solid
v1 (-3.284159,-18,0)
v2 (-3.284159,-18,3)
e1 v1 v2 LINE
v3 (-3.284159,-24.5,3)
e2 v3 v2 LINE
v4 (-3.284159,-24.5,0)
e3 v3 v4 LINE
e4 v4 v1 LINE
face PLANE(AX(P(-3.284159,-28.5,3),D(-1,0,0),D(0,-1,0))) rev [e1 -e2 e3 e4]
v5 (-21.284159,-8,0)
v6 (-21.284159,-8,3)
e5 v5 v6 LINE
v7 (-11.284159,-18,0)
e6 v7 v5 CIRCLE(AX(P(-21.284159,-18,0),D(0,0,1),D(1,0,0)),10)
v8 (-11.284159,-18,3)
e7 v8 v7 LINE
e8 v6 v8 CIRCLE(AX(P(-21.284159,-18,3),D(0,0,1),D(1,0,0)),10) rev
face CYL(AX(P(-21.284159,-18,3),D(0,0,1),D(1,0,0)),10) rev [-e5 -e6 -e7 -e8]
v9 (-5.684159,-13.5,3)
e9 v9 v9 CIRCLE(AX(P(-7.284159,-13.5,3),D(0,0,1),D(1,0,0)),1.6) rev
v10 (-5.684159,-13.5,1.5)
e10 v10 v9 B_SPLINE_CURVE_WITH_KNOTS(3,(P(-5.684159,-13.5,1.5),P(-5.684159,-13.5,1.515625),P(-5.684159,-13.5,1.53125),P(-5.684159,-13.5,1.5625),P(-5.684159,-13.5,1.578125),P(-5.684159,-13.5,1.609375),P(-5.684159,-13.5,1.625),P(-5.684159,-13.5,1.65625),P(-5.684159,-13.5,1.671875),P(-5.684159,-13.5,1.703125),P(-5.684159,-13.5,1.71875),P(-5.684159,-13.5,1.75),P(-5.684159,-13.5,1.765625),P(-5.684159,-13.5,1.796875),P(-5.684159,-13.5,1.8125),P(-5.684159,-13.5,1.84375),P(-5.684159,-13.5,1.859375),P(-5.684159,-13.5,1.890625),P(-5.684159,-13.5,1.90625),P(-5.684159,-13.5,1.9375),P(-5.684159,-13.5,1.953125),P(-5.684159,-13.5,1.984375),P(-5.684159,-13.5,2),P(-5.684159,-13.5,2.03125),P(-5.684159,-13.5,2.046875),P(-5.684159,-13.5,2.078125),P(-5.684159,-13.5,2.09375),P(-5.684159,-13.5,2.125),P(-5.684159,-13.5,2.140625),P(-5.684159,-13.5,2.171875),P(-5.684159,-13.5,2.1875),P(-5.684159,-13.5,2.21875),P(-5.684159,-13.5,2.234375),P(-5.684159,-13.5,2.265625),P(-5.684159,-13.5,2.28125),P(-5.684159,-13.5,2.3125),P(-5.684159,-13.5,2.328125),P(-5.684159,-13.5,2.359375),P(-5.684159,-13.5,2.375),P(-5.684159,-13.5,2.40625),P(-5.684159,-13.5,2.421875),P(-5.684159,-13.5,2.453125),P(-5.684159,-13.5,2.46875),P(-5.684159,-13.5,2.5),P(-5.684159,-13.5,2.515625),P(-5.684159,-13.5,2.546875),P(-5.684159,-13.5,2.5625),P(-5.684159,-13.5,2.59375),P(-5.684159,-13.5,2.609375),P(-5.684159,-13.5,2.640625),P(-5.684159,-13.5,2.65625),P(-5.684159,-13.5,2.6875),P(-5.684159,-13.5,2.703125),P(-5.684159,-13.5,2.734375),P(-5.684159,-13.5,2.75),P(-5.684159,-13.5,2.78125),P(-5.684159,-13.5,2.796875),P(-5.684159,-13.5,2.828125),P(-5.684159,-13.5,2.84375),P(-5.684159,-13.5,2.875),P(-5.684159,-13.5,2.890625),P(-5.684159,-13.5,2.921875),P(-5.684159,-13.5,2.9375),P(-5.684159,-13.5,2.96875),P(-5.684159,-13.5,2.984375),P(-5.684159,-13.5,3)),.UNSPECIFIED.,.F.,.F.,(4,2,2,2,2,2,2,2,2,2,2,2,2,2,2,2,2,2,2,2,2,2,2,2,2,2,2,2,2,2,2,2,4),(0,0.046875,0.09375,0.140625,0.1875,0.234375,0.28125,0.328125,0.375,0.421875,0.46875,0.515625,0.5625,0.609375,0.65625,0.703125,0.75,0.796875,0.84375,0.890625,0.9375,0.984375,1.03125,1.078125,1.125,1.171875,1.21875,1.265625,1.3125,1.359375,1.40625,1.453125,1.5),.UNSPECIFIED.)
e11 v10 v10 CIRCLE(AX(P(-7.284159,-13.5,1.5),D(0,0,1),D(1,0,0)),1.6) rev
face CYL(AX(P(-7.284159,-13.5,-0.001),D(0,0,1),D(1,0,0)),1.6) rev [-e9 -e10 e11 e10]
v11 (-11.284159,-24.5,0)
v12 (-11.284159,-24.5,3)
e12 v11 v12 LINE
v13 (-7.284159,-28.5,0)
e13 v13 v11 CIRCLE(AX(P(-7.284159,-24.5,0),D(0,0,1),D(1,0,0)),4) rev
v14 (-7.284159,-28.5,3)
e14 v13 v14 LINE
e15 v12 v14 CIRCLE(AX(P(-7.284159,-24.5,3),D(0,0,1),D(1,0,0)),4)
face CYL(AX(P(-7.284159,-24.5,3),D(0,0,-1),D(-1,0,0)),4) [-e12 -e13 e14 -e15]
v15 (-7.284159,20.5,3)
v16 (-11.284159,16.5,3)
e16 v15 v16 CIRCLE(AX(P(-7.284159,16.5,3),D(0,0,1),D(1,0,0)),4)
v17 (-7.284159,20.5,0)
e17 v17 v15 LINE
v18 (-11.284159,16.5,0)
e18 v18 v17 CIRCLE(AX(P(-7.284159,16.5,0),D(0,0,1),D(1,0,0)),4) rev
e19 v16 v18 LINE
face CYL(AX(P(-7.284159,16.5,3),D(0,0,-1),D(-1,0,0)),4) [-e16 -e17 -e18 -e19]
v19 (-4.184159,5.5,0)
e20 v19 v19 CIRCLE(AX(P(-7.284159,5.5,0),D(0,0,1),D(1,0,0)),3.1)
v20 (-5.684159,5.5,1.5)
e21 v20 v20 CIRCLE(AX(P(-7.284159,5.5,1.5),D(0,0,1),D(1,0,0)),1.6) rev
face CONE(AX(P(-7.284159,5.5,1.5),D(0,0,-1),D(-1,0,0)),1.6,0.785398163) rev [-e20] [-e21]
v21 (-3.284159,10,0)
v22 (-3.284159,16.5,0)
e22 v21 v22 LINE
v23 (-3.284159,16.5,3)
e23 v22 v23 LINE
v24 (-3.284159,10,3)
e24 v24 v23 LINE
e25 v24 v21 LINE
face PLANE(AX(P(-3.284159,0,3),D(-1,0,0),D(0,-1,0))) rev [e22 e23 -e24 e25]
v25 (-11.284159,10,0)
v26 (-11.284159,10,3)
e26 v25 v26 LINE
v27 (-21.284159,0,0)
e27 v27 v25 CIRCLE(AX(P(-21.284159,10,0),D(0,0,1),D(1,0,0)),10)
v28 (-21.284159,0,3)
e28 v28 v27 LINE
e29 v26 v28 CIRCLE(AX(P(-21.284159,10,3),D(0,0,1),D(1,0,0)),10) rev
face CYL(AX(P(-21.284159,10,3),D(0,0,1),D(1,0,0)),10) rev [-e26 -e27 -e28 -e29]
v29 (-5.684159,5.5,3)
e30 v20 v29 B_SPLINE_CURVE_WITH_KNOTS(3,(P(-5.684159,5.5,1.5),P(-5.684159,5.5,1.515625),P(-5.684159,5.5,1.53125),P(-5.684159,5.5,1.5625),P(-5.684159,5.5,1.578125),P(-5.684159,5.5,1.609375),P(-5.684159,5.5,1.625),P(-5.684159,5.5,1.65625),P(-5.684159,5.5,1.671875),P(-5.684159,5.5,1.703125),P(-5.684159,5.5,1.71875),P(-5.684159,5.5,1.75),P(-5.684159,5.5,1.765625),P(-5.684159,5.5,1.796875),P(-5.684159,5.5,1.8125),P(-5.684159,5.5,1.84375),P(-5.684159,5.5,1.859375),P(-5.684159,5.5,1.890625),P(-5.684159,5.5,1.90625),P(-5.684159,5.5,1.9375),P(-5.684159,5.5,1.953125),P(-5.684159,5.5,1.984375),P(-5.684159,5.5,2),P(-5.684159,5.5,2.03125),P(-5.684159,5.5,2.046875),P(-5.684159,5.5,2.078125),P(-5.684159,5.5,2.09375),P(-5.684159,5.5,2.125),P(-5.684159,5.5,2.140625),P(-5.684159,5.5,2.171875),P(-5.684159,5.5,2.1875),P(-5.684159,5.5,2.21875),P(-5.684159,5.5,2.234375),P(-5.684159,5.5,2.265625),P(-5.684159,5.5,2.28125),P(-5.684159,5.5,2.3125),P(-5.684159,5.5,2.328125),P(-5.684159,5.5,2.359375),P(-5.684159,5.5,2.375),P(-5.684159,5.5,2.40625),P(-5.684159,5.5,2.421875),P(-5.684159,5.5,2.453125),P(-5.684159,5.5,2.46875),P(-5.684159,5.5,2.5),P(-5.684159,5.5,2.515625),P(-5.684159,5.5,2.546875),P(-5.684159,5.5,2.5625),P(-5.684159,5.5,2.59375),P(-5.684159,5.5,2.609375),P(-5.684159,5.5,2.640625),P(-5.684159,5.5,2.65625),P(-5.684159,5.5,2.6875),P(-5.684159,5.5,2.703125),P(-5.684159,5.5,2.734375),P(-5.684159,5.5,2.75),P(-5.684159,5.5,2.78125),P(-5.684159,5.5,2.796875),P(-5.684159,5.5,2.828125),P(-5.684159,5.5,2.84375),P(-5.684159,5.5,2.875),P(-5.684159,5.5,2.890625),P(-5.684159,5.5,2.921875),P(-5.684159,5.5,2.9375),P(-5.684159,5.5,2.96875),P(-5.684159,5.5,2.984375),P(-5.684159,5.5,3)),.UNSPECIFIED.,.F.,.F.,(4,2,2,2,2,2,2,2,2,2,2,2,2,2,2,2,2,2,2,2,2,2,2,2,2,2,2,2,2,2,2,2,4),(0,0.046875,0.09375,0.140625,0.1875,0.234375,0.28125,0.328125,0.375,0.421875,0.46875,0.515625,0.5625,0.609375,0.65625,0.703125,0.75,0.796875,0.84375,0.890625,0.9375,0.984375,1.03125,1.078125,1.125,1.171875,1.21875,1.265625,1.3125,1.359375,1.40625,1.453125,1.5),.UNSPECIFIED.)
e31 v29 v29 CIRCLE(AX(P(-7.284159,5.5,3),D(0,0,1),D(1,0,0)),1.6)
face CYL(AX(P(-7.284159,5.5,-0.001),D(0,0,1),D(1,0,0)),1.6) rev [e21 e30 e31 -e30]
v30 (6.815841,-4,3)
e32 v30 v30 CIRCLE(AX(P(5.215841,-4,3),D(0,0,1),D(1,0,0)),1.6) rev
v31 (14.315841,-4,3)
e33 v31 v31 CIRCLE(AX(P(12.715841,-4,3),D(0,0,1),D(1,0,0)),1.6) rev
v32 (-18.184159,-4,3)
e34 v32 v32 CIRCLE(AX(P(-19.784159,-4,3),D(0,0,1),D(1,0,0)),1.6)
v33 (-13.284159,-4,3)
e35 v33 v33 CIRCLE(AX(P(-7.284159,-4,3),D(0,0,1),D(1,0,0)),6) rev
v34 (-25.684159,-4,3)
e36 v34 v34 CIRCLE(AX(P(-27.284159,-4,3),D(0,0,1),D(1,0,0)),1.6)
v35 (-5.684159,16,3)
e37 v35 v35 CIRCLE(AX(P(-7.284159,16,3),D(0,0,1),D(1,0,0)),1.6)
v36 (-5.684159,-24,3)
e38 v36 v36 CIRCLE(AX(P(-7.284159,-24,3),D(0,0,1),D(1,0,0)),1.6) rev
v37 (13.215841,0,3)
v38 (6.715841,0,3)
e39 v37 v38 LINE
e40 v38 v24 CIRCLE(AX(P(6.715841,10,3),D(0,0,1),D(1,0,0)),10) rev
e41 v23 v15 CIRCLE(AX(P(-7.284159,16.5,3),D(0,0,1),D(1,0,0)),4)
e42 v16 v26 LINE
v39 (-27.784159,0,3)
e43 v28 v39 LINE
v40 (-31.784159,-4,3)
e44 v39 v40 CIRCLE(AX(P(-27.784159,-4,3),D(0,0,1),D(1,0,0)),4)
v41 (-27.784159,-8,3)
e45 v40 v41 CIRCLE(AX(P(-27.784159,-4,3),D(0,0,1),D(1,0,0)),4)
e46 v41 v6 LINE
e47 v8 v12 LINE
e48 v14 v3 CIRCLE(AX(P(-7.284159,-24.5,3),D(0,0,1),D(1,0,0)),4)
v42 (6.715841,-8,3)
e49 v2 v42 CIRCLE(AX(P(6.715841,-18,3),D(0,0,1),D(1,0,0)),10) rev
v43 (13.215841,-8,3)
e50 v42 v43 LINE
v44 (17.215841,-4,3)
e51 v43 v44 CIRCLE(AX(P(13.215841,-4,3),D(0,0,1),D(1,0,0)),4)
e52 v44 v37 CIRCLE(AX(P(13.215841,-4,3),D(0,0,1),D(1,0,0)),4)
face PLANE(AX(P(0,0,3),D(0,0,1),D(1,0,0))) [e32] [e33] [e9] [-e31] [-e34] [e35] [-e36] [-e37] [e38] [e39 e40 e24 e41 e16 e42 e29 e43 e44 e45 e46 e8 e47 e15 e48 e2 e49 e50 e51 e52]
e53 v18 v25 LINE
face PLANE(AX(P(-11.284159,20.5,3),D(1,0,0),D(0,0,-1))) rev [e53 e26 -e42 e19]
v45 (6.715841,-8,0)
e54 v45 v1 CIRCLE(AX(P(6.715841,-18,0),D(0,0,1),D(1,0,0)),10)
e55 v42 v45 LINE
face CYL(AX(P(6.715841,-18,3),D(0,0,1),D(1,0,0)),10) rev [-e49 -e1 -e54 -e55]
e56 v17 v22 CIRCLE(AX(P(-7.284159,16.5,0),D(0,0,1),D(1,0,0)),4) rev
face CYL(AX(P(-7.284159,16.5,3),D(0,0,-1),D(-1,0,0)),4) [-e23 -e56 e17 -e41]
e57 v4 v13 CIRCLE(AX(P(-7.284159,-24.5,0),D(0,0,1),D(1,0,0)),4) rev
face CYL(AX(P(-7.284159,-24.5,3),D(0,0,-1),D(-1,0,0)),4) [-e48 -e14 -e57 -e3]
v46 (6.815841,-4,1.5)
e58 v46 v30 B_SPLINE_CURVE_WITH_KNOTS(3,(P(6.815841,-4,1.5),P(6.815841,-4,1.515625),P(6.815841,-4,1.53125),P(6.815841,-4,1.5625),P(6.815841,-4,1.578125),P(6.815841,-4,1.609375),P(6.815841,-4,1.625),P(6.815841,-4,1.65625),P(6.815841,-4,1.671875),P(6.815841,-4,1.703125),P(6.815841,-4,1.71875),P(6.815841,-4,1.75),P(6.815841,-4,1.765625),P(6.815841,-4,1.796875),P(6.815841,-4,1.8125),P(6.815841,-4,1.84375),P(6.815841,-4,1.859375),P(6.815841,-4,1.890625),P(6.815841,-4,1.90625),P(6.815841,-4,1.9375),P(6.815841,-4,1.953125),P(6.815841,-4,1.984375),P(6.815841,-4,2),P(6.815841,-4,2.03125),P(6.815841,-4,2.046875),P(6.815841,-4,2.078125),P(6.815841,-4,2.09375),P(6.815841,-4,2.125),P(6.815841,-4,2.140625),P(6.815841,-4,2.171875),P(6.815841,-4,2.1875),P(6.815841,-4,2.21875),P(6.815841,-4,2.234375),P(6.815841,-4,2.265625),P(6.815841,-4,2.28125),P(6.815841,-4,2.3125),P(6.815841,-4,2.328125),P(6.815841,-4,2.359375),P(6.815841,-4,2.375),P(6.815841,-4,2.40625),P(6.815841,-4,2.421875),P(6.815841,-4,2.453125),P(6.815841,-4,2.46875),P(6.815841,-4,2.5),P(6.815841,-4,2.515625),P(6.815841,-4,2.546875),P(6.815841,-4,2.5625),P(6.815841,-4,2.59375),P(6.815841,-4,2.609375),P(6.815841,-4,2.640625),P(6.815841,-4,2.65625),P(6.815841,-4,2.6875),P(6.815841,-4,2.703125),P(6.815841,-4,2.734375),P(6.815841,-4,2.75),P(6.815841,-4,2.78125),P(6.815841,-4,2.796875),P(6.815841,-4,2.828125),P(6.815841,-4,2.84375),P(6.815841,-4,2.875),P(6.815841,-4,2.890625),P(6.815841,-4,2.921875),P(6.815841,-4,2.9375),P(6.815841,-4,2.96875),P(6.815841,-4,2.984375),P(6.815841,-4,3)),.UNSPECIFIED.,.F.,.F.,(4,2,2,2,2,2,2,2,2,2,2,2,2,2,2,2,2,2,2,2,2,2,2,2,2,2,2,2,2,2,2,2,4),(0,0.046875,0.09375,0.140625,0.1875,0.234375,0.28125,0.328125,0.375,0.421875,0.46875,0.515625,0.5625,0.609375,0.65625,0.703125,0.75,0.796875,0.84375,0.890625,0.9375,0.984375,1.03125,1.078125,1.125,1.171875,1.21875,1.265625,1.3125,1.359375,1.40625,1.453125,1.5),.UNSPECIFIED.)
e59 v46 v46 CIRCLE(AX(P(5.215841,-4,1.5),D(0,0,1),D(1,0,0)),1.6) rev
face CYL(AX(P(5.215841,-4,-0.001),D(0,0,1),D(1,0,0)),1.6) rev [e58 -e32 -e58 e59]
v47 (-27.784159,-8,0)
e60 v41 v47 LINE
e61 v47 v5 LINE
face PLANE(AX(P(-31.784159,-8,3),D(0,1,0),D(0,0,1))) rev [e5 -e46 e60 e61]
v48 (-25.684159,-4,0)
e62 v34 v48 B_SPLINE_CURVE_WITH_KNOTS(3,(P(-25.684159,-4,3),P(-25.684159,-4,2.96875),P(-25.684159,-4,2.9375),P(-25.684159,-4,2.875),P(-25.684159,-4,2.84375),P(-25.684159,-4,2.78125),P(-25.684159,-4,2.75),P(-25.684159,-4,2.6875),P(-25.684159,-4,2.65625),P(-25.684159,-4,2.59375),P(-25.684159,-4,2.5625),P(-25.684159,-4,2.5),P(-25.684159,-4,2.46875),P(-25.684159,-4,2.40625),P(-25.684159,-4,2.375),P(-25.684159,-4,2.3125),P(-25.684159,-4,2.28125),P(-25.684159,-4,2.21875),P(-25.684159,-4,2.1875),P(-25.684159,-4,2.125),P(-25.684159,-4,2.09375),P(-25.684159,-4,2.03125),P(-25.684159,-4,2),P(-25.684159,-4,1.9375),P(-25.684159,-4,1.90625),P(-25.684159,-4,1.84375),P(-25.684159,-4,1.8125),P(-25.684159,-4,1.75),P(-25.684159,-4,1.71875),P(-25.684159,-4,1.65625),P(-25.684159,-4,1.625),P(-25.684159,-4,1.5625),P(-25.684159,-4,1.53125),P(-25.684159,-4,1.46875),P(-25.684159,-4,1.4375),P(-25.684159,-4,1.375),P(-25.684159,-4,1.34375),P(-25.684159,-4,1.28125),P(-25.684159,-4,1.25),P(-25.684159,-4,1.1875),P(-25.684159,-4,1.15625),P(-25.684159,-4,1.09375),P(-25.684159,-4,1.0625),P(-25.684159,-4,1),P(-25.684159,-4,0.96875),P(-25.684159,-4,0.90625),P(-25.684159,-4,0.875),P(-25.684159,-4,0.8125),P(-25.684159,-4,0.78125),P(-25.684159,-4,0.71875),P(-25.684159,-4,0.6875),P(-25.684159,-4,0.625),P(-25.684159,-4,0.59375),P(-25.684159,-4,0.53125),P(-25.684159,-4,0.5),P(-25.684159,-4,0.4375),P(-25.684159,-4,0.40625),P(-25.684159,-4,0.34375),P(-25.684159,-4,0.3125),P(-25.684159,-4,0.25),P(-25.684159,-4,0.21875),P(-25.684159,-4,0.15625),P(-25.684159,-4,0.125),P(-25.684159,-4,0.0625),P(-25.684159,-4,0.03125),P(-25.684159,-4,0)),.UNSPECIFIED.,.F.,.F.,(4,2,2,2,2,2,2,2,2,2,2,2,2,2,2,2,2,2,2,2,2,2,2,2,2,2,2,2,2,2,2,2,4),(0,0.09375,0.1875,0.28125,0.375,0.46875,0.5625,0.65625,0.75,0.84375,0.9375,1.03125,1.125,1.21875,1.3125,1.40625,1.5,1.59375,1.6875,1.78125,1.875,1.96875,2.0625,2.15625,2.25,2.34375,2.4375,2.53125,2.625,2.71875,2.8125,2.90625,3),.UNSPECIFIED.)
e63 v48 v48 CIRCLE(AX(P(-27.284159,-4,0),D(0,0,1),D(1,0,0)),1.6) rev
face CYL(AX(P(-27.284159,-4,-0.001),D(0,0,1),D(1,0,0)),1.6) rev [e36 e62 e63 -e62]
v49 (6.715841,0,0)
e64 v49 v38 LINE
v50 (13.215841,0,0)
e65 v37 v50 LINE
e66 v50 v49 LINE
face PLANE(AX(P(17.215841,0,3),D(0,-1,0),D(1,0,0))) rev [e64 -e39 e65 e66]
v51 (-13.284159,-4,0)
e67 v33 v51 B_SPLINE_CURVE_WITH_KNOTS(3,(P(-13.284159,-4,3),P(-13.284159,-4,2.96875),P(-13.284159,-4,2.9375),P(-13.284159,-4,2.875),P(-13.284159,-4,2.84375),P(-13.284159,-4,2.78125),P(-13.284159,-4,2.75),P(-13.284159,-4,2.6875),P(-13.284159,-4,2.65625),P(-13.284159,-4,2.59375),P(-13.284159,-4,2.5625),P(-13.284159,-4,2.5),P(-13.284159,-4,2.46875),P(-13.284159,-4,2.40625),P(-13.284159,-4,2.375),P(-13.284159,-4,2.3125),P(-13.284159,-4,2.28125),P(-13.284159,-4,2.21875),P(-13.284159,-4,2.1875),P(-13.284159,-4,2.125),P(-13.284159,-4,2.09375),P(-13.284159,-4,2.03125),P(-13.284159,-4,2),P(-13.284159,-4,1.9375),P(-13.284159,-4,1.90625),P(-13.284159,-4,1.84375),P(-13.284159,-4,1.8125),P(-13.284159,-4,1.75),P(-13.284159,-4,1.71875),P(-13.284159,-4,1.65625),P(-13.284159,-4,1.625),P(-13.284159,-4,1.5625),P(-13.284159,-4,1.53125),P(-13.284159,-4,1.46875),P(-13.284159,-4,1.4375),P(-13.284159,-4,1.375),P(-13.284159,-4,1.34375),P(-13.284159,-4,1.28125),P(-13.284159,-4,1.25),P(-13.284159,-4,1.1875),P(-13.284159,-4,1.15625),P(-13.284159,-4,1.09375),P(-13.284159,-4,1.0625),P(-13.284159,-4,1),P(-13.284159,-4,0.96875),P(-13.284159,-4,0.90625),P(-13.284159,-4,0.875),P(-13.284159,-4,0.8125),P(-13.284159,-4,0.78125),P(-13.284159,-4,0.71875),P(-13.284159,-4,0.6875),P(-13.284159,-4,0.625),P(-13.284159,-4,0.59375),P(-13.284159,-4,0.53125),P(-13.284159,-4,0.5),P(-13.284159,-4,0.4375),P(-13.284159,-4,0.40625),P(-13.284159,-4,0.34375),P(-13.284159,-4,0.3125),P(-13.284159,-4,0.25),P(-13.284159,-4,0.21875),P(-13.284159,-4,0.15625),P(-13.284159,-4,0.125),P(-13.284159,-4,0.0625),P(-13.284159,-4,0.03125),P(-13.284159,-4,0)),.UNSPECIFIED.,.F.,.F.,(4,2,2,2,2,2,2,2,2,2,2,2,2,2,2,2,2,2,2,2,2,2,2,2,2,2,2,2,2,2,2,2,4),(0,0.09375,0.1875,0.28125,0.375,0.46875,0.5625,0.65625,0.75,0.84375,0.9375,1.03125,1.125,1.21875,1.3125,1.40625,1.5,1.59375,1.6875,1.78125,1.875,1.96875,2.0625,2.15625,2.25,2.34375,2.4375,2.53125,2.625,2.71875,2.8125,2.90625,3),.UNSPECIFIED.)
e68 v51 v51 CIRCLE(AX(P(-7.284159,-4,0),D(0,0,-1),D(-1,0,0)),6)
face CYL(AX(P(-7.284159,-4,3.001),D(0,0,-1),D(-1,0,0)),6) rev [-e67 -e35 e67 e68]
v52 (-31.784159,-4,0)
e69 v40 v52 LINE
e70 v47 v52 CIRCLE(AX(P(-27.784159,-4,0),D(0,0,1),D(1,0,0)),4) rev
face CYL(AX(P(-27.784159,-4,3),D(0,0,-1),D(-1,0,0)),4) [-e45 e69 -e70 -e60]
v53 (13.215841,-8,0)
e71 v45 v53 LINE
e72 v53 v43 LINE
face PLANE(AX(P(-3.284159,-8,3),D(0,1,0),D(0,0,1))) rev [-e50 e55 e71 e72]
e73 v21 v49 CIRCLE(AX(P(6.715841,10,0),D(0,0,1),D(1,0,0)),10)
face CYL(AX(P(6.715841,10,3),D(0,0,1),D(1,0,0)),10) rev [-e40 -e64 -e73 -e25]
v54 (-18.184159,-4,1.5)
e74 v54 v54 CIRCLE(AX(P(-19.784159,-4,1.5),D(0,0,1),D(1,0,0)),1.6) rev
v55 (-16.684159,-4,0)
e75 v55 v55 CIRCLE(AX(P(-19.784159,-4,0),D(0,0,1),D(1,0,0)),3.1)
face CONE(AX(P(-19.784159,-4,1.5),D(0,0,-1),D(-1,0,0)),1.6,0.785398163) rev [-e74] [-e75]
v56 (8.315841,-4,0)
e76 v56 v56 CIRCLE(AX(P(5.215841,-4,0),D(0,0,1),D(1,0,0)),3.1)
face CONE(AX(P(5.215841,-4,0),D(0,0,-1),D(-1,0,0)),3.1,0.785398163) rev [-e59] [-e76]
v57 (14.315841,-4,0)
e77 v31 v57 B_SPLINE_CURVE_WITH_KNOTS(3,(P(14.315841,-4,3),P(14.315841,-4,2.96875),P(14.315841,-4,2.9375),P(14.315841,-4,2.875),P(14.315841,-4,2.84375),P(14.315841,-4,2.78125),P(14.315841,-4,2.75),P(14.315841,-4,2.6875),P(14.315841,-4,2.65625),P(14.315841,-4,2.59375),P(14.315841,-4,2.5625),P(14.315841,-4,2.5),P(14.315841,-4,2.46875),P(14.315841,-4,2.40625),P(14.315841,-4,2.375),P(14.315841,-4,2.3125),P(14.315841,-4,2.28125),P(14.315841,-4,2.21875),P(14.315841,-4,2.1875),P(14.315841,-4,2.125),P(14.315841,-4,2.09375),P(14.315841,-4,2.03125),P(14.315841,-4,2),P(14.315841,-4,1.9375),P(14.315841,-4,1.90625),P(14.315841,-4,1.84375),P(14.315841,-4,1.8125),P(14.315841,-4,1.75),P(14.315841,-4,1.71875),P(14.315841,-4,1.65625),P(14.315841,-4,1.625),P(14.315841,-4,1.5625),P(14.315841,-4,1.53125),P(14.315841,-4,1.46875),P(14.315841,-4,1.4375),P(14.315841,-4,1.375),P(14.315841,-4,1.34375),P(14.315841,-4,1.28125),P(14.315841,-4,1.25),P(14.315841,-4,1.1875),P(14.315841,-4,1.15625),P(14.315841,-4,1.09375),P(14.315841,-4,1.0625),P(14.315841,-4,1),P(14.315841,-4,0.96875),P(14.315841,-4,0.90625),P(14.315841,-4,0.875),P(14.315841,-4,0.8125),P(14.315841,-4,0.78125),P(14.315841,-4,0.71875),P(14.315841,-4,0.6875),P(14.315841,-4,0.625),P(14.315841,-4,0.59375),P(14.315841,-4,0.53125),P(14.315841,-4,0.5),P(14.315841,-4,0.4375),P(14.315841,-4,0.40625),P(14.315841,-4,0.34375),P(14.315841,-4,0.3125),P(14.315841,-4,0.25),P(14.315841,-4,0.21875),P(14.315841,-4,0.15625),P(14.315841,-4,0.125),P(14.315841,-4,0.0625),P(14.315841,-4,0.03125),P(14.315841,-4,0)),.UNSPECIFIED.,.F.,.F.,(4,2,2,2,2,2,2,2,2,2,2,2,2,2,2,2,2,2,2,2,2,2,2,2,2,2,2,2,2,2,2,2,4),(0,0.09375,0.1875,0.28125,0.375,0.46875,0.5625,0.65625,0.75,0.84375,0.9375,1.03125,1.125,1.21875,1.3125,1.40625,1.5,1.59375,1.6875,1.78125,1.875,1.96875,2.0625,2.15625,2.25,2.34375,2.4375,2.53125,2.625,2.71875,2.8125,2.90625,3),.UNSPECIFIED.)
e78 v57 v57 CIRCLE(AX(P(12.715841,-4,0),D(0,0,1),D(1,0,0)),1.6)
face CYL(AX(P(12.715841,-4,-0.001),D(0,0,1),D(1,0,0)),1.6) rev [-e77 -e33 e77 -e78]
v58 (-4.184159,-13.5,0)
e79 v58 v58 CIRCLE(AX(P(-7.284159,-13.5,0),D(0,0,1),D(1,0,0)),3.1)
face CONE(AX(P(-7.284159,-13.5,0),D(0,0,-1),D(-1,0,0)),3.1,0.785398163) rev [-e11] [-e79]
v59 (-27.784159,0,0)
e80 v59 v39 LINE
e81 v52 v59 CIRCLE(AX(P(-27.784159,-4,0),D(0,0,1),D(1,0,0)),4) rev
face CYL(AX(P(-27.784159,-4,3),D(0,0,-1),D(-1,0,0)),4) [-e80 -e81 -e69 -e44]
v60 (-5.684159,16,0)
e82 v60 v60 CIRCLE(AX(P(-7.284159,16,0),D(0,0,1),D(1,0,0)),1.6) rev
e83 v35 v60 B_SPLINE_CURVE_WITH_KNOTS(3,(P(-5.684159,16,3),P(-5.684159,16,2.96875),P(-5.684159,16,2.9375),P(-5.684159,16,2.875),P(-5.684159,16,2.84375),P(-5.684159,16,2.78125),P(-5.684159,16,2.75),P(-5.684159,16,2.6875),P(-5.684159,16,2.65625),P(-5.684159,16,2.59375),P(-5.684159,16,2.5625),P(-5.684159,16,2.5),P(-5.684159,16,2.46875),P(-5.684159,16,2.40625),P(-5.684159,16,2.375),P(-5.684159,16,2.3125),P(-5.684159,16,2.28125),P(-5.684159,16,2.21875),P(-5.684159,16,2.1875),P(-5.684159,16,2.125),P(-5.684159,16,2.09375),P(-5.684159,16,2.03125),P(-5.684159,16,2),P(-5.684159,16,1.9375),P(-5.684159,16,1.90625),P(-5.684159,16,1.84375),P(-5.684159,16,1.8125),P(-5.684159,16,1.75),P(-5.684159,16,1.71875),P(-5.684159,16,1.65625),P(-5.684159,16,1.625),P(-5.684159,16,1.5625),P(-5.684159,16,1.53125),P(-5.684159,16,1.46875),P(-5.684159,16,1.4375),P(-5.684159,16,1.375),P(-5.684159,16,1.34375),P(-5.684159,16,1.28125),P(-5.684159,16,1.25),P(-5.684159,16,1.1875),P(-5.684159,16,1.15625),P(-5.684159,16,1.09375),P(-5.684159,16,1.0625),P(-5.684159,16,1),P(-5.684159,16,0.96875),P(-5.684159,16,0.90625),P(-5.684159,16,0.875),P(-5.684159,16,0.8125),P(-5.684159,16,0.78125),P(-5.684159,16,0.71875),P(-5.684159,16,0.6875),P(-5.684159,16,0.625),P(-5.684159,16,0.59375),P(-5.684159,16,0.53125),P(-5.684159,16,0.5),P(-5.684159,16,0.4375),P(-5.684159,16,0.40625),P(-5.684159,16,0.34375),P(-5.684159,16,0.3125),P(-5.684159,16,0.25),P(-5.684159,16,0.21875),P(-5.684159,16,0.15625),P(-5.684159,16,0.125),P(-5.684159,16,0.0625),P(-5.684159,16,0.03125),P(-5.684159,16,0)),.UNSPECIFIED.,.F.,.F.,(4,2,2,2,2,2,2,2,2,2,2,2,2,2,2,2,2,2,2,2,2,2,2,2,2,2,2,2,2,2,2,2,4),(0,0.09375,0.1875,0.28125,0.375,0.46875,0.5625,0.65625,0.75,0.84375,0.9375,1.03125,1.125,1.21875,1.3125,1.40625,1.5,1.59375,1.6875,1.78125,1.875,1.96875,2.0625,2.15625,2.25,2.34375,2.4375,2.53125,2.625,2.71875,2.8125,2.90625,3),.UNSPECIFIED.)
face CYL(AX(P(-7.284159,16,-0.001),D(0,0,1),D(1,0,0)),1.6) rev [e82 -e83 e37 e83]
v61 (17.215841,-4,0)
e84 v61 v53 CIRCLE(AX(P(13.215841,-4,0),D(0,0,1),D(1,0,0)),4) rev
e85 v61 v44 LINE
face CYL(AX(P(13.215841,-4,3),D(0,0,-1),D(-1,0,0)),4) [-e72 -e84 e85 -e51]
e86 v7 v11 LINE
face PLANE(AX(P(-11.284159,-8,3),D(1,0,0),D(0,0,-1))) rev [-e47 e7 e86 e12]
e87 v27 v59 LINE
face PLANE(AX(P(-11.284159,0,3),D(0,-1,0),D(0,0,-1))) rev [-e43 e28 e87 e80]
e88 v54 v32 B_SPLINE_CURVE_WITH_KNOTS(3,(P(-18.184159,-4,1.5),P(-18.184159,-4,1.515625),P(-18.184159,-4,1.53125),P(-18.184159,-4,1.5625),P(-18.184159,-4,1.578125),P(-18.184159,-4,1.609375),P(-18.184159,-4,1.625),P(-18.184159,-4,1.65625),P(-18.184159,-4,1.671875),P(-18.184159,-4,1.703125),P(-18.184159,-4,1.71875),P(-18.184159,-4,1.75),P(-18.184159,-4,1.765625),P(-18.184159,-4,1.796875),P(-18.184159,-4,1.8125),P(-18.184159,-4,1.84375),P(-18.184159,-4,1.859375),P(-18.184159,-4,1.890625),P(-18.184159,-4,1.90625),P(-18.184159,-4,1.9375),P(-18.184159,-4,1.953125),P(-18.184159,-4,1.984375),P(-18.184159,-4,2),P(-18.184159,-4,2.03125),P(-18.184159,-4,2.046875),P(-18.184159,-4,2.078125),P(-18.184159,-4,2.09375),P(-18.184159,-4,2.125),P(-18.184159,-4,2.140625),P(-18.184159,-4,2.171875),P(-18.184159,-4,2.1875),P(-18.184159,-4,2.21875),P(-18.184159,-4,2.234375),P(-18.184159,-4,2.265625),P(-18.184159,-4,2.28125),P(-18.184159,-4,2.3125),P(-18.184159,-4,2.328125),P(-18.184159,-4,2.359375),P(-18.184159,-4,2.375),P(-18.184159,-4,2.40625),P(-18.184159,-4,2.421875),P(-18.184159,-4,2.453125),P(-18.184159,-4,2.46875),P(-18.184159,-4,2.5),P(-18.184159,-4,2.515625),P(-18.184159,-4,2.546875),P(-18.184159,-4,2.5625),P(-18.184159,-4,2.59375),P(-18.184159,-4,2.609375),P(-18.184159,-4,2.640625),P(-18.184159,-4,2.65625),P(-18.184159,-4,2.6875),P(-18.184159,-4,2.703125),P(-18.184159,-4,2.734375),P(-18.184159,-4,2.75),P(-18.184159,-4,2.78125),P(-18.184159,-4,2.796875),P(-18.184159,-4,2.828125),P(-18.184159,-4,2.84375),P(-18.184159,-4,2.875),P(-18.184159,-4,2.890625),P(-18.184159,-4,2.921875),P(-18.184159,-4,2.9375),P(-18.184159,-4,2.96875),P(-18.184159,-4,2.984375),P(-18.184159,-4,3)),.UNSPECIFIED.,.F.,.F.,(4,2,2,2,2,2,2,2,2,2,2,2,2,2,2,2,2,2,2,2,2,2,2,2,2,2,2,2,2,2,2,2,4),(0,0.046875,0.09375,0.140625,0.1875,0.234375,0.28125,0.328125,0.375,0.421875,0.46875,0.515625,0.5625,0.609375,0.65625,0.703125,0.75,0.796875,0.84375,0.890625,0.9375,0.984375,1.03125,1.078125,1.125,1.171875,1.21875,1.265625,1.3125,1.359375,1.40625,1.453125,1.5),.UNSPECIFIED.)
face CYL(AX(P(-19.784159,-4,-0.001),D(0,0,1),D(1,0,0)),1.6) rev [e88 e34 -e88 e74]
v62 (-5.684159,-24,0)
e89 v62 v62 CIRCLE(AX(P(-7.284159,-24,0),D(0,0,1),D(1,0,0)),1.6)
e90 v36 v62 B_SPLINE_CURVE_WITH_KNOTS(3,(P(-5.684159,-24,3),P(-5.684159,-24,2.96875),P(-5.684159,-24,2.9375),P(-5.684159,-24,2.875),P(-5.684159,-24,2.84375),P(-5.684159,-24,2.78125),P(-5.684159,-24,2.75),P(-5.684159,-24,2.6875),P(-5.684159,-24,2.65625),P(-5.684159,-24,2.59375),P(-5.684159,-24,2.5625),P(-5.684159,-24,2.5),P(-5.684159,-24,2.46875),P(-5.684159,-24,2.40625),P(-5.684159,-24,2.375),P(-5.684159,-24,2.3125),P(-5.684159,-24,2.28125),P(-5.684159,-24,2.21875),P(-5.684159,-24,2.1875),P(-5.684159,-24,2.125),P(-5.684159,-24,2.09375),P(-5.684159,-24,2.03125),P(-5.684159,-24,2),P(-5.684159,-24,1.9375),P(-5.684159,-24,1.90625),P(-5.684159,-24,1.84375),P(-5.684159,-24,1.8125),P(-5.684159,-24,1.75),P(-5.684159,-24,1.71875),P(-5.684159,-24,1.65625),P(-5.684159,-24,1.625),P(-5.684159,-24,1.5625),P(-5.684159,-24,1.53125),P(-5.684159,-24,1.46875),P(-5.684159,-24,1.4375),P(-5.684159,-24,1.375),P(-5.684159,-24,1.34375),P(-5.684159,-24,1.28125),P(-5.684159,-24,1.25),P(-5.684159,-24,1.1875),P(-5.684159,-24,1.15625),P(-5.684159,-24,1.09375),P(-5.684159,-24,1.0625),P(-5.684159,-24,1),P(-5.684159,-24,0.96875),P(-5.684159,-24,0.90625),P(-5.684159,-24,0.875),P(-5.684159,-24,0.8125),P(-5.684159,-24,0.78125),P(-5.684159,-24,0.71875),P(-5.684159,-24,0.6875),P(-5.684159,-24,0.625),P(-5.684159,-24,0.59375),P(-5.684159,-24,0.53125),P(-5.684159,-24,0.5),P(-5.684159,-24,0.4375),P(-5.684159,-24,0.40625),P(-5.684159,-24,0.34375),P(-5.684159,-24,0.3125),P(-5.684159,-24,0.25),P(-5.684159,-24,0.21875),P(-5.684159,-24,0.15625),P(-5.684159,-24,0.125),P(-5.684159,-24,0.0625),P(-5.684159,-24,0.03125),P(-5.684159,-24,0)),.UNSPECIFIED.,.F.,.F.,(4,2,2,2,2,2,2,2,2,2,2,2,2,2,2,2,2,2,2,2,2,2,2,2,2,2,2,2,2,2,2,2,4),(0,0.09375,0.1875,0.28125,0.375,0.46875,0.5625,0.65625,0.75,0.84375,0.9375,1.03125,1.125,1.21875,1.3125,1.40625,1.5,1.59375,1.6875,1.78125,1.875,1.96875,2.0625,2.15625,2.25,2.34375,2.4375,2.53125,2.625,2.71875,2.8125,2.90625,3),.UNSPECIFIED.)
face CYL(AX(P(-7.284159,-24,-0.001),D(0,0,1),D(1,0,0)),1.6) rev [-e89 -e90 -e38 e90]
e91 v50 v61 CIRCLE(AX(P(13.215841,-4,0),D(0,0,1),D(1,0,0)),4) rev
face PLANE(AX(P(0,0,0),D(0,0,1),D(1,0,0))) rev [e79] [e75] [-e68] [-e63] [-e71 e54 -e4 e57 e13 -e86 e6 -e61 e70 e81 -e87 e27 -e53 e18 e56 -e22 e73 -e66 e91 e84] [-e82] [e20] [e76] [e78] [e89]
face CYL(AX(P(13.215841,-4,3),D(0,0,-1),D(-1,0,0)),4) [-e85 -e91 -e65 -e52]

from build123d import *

# Parameters (mm, degrees)
BOSS_EXTRU_1_DEPTH      = 3
ENL_V_MAT_EXTRU_1_REACH = 44.796
ESQUISSE2_R             = 1.6
CONG_1_R                = 10
CONG_2_R                = 4
ENL_V_MAT_EXTRU_2_REACH = 44.796
ESQUISSE3_R             = 6
CHANFREIN1_SIZE         = 1.5


with BuildPart() as part:
    # Esquisse1 → Boss.-Extru.1 (new body)
    with BuildSketch(Plane.XY):
        Polygon((-11.28415855, 20.5), (-11.28415855, 0), (-31.78415855, 0), (-31.78415855, -8), (-11.28415855, -8), (-11.28415855, -28.5), (-3.28415855, -28.5), (-3.28415855, -8), (17.21584145, -8), (17.21584145, 0), (-3.28415855, 0), (-3.28415855, 20.5), align=None)
    extrude(amount=BOSS_EXTRU_1_DEPTH)

    # Esquisse2 → Enlèv. mat.-Extru.1 (cut, up to next)
    with BuildSketch(Plane.XY.offset(3), mode=Mode.PRIVATE) as enl_v_mat_extru_1_sk1:
        with Locations((-27.28415855, -4)):
            Circle(ESQUISSE2_R)
    enl_v_mat_extru_1_tool1 = extrude(enl_v_mat_extru_1_sk1.sketch, amount=-ENL_V_MAT_EXTRU_1_REACH, mode=Mode.PRIVATE) & part.part
    # Esquisse2 → Enlèv. mat.-Extru.1 (cut, up to next)
    with BuildSketch(Plane.XY.offset(3), mode=Mode.PRIVATE) as enl_v_mat_extru_1_sk2:
        with Locations((-19.78415855, -4)):
            Circle(ESQUISSE2_R)
    enl_v_mat_extru_1_tool2 = extrude(enl_v_mat_extru_1_sk2.sketch, amount=-ENL_V_MAT_EXTRU_1_REACH, mode=Mode.PRIVATE) & part.part
    # Esquisse2 → Enlèv. mat.-Extru.1 (cut, up to next)
    with BuildSketch(Plane.XY.offset(3), mode=Mode.PRIVATE) as enl_v_mat_extru_1_sk3:
        with Locations((-7.28415855, -13.5)):
            Circle(ESQUISSE2_R)
    enl_v_mat_extru_1_tool3 = extrude(enl_v_mat_extru_1_sk3.sketch, amount=-ENL_V_MAT_EXTRU_1_REACH, mode=Mode.PRIVATE) & part.part
    # Esquisse2 → Enlèv. mat.-Extru.1 (cut, up to next)
    with BuildSketch(Plane.XY.offset(3), mode=Mode.PRIVATE) as enl_v_mat_extru_1_sk4:
        with Locations((-7.28415855, 5.5)):
            Circle(ESQUISSE2_R)
    enl_v_mat_extru_1_tool4 = extrude(enl_v_mat_extru_1_sk4.sketch, amount=-ENL_V_MAT_EXTRU_1_REACH, mode=Mode.PRIVATE) & part.part
    # Esquisse2 → Enlèv. mat.-Extru.1 (cut, up to next)
    with BuildSketch(Plane.XY.offset(3), mode=Mode.PRIVATE) as enl_v_mat_extru_1_sk5:
        with Locations((-7.28415855, 16)):
            Circle(ESQUISSE2_R)
    enl_v_mat_extru_1_tool5 = extrude(enl_v_mat_extru_1_sk5.sketch, amount=-ENL_V_MAT_EXTRU_1_REACH, mode=Mode.PRIVATE) & part.part
    # Esquisse2 → Enlèv. mat.-Extru.1 (cut, up to next)
    with BuildSketch(Plane.XY.offset(3), mode=Mode.PRIVATE) as enl_v_mat_extru_1_sk6:
        with Locations((5.21584145, -4)):
            Circle(ESQUISSE2_R)
    enl_v_mat_extru_1_tool6 = extrude(enl_v_mat_extru_1_sk6.sketch, amount=-ENL_V_MAT_EXTRU_1_REACH, mode=Mode.PRIVATE) & part.part
    # Esquisse2 → Enlèv. mat.-Extru.1 (cut, up to next)
    with BuildSketch(Plane.XY.offset(3), mode=Mode.PRIVATE) as enl_v_mat_extru_1_sk7:
        with Locations((12.71584145, -4)):
            Circle(ESQUISSE2_R)
    enl_v_mat_extru_1_tool7 = extrude(enl_v_mat_extru_1_sk7.sketch, amount=-ENL_V_MAT_EXTRU_1_REACH, mode=Mode.PRIVATE) & part.part
    # Esquisse2 → Enlèv. mat.-Extru.1 (cut, up to next)
    with BuildSketch(Plane.XY.offset(3), mode=Mode.PRIVATE) as enl_v_mat_extru_1_sk8:
        with Locations((-7.28415855, -24)):
            Circle(ESQUISSE2_R)
    enl_v_mat_extru_1_tool8 = extrude(enl_v_mat_extru_1_sk8.sketch, amount=-ENL_V_MAT_EXTRU_1_REACH, mode=Mode.PRIVATE) & part.part
    add(enl_v_mat_extru_1_tool1.solids().sort_by_distance((-27.284159, -4, 3))[0], mode=Mode.SUBTRACT)
    add(enl_v_mat_extru_1_tool2.solids().sort_by_distance((-19.784159, -4, 3))[0], mode=Mode.SUBTRACT)
    add(enl_v_mat_extru_1_tool3.solids().sort_by_distance((-7.284159, -13.5, 3))[0], mode=Mode.SUBTRACT)
    add(enl_v_mat_extru_1_tool4.solids().sort_by_distance((-7.284159, 5.5, 3))[0], mode=Mode.SUBTRACT)
    add(enl_v_mat_extru_1_tool5.solids().sort_by_distance((-7.284159, 16, 3))[0], mode=Mode.SUBTRACT)
    add(enl_v_mat_extru_1_tool6.solids().sort_by_distance((5.215841, -4, 3))[0], mode=Mode.SUBTRACT)
    add(enl_v_mat_extru_1_tool7.solids().sort_by_distance((12.715841, -4, 3))[0], mode=Mode.SUBTRACT)
    add(enl_v_mat_extru_1_tool8.solids().sort_by_distance((-7.284159, -24, 3))[0], mode=Mode.SUBTRACT)

    # Congé1
    cong_1_edges = [part.edges().sort_by_distance(p)[0] for p in [
        (-3.28415855, 0, 1.5),
        (-3.28415855, -8, 1.5),
        (-11.28415855, -8, 1.5),
        (-11.28415855, 0, 1.5),
    ]]
    fillet(cong_1_edges, radius=CONG_1_R)

    # Congé2
    cong_2_edges = [part.edges().sort_by_distance(p)[0] for p in [
        (-11.28415855, -28.5, 1.5),
        (-3.28415855, -28.5, 1.5),
        (17.21584145, -8, 1.5),
        (17.21584145, 0, 1.5),
        (-3.28415855, 20.5, 1.5),
        (-11.28415855, 20.5, 1.5),
        (-31.78415855, -8, 1.5),
        (-31.78415855, 0, 1.5),
    ]]
    fillet(cong_2_edges, radius=CONG_2_R - 0.0001)  # a hair under: the kernel refuses the full size

    # Esquisse3 → Enlèv. mat.-Extru.2 (cut, up to next)
    with BuildSketch(Plane(origin=(0, 0, 0), x_dir=(-1, 0, 0), z_dir=(0, 0, -1)), mode=Mode.PRIVATE) as enl_v_mat_extru_2_sk1:
        with Locations((7.28415855, -4)):
            Circle(ESQUISSE3_R)
    enl_v_mat_extru_2_tool1 = extrude(enl_v_mat_extru_2_sk1.sketch, amount=-ENL_V_MAT_EXTRU_2_REACH, mode=Mode.PRIVATE) & part.part
    add(enl_v_mat_extru_2_tool1.solids().sort_by_distance((-7.284159, -4, 0))[0], mode=Mode.SUBTRACT)

    # Chanfrein1
    chanfrein1_edges = [part.edges().sort_by_distance(p)[0] for p in [
        (3.61584145, -4, 0),
        (-8.88415855, 5.5, 0),
        (-8.88415855, -13.5, 0),
        (-21.38415855, -4, 0),
    ]]
    chamfer(chanfrein1_edges, length=CHANFREIN1_SIZE)


solid = part.part
